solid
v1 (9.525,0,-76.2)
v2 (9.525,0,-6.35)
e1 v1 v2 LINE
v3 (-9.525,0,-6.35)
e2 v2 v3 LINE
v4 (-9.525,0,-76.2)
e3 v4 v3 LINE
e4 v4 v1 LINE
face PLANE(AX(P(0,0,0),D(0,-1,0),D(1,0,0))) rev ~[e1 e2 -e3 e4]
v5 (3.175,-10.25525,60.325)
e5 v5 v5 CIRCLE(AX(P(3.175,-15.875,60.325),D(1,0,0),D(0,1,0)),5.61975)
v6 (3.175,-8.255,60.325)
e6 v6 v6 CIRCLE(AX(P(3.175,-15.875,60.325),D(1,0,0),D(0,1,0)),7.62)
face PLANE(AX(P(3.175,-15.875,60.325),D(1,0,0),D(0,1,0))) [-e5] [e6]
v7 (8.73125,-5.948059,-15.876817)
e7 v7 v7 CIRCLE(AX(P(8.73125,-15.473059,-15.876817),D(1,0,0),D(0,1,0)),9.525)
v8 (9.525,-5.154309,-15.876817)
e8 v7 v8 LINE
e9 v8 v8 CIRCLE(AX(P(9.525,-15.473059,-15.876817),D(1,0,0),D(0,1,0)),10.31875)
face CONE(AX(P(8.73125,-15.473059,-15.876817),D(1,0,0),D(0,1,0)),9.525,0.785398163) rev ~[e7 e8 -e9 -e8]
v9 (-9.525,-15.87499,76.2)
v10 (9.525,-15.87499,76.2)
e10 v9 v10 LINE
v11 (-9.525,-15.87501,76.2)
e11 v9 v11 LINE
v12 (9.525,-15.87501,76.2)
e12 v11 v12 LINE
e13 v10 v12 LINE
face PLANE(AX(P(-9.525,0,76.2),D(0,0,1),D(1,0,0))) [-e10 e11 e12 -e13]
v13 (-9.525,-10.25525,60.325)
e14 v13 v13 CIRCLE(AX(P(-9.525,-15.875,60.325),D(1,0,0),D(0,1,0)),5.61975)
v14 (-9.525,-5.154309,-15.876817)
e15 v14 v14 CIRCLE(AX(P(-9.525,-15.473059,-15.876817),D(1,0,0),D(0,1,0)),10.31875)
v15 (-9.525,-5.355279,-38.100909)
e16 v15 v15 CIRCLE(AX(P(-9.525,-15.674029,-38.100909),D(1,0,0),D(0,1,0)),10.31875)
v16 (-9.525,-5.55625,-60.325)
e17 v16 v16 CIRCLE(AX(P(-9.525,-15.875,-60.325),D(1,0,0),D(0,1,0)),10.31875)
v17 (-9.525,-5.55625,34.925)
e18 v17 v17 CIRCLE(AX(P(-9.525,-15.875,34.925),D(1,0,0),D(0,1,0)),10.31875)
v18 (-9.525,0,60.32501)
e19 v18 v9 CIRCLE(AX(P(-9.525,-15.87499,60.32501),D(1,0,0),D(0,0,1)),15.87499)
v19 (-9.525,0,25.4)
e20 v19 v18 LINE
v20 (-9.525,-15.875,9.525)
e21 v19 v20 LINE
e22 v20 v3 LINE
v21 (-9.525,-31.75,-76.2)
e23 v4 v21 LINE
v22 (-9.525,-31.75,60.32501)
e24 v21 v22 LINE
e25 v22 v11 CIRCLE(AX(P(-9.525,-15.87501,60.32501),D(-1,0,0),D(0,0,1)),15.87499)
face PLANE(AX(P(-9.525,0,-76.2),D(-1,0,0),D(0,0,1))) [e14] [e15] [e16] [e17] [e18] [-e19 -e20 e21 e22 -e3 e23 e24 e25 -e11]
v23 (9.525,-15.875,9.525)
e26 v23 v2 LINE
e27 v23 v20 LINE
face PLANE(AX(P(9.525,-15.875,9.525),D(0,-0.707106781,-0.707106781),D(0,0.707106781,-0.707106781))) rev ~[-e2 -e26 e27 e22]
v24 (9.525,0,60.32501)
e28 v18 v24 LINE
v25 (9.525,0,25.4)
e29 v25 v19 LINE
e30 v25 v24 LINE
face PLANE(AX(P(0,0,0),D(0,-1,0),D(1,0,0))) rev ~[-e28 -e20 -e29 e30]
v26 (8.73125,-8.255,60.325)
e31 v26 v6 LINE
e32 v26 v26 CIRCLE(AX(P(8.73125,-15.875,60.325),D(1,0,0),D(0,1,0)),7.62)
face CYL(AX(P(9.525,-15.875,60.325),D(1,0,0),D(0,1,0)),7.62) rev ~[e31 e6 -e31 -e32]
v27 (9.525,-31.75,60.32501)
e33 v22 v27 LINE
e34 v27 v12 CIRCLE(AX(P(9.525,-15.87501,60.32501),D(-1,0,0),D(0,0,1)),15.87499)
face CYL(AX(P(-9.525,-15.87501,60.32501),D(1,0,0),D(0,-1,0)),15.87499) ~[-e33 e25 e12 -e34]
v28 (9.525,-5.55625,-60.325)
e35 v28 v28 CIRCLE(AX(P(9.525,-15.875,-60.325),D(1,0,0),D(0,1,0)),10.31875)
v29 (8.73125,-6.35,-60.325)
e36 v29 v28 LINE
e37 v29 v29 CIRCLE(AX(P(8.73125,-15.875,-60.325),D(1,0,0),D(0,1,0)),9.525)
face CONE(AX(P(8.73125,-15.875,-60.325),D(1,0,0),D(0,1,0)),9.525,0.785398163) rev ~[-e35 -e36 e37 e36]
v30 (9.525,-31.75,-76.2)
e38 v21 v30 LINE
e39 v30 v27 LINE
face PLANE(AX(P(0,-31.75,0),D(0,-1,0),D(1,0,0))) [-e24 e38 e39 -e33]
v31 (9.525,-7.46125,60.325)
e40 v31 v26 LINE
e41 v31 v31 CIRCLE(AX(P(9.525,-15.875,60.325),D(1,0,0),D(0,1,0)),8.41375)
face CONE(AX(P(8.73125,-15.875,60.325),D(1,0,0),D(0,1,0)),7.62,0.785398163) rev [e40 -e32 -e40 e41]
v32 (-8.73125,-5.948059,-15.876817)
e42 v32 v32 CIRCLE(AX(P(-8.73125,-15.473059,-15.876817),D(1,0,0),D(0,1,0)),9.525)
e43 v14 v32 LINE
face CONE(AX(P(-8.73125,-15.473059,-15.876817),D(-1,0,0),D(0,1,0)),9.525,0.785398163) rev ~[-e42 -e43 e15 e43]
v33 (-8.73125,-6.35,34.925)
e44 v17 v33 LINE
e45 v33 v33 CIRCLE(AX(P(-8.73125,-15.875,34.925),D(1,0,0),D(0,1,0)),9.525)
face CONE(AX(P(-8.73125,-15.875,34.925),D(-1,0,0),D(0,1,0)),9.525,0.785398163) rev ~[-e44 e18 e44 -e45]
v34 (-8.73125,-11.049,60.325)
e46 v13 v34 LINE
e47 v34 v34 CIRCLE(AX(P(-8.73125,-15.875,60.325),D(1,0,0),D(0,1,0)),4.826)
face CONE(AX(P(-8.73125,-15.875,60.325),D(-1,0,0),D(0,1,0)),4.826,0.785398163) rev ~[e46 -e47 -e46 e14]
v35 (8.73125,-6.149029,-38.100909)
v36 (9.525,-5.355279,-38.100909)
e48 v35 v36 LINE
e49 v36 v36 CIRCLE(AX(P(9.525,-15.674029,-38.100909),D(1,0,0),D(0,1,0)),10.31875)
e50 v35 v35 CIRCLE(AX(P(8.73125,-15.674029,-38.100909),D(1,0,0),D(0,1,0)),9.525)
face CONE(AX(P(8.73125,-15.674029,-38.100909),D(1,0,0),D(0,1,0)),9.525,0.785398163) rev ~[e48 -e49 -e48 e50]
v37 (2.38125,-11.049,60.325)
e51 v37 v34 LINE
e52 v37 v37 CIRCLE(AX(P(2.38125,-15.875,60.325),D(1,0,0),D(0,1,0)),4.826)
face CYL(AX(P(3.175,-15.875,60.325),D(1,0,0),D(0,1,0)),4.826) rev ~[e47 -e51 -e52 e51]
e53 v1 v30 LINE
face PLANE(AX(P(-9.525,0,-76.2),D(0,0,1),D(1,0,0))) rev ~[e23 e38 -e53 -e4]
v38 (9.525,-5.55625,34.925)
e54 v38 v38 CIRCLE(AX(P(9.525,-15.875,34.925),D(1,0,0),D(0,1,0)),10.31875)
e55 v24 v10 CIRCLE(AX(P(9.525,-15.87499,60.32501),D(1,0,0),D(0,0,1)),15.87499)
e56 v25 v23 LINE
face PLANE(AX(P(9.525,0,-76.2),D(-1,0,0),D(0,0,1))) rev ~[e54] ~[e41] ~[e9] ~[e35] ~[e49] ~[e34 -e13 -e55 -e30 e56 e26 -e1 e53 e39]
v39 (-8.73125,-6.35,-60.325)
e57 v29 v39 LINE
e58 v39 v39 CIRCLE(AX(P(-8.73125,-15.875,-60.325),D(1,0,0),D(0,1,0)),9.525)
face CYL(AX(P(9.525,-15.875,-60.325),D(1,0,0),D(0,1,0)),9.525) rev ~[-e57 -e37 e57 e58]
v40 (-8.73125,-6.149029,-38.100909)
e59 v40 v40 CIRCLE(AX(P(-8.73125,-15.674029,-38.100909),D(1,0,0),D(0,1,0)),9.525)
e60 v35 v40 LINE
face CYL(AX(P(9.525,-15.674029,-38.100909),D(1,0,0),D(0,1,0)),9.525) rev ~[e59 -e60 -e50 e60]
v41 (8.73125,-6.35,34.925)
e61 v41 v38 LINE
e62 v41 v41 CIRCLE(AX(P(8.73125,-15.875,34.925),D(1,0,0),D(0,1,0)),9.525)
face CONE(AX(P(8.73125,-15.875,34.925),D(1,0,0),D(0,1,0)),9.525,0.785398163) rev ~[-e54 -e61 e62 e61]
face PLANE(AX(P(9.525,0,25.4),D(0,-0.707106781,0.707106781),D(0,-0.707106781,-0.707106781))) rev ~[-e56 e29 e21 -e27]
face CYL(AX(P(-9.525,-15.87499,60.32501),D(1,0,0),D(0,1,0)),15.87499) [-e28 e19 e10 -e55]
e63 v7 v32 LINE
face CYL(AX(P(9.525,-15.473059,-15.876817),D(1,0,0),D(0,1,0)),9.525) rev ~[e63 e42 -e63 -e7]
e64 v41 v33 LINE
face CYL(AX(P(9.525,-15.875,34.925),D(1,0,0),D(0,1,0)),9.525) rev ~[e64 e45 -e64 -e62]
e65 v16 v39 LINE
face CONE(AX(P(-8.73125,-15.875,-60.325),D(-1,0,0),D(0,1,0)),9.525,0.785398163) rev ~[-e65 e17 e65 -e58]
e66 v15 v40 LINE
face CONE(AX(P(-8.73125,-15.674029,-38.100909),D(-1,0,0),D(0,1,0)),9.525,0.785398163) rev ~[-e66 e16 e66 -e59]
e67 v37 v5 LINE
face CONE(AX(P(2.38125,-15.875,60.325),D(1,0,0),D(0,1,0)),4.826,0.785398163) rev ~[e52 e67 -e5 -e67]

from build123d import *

# Parameters (mm, degrees)
F0_W     = 19.05
F0_H     = 152.4
F1_DEPTH = 31.75
F8_R     = 7.62
F2_DEPTH = 6.35
F3_R     = 4.826
F9_DEPTH = 12.7
F4_R     = 15.87499
F5_DEPTH = 19.05
F8_R_2   = 9.525
F6_DEPTH = 19.05
F7_SIZE  = 0.79375


# Not quite as in the source:
# - a fillet or chamfer is up to 0.001 mm smaller than in the source, because OpenCascade refuses the exact size


with BuildPart() as f1:
    # F0 (on Front) → F1 (new body)
    with BuildSketch(Plane.XZ):
        Rectangle(F0_W, F0_H)
    extrude(amount=F1_DEPTH)

    # F8 (on face) → F2 (cut)
    with BuildSketch(Plane.YZ.offset(9.525)):
        with Locations((-15.875, 60.325)):
            Circle(F8_R)
    extrude(amount=-F2_DEPTH, mode=Mode.SUBTRACT)

    # F3 (on face) → F9 (cut, through all)
    with BuildSketch(Plane.YZ.offset(3.175)):
        with Locations((-15.875, 60.325)):
            Circle(F3_R)
    extrude(amount=-F9_DEPTH, mode=Mode.SUBTRACT)

    # F4 (radius 15.875 in the source; OpenCascade refuses exactly that, so slightly less here)
    f4_edges = [f1.edges().sort_by_distance(p)[0] for p in [
        (0, -31.75, 76.2),
        (0, 0, 76.2),
    ]]
    fillet(f4_edges, radius=F4_R)

    # F8 (on face) → F5 (cut, through all)
    with BuildSketch(Plane.YZ.offset(9.525)):
        Polygon((0, 25.4), (-15.875, 9.525), (0, -6.35), align=None)
    extrude(amount=-F5_DEPTH, mode=Mode.SUBTRACT)

    # F8 (on face) → F6 (cut, through all)
    with BuildSketch(Plane.YZ.offset(9.525)):
        with Locations((-15.875, 34.925)):
            Circle(F8_R_2)
        with Locations((-15.4730585432, -15.8768173255)):
            Circle(F8_R_2)
        with Locations((-15.6740292716, -38.1009086628)):
            Circle(F8_R_2)
        with Locations((-15.875, -60.325)):
            Circle(F8_R_2)
    extrude(amount=-F6_DEPTH, mode=Mode.SUBTRACT)

    # F7
    f7_edges = [f1.edges().sort_by_distance(p)[0] for p in [
        (0, -6.35, 34.925),
        (9.525, -25.4, 34.925),
        (-9.525, -25.4, 34.925),
        (0, -5.948059, -15.876817),
        (9.525, -24.998059, -15.876817),
        (-9.525, -24.998059, -15.876817),
        (0, -6.149029, -38.100909),
        (9.525, -25.199029, -38.100909),
        (-9.525, -25.199029, -38.100909),
        (0, -6.35, -60.325),
        (9.525, -25.4, -60.325),
        (-9.525, -25.4, -60.325),
        (9.525, -23.495, 60.325),
        (-3.175, -11.049, 60.325),
        (3.175, -20.701, 60.325),
        (-9.525, -20.701, 60.325),
    ]]
    chamfer(f7_edges, length=F7_SIZE)


solid = f1.part
